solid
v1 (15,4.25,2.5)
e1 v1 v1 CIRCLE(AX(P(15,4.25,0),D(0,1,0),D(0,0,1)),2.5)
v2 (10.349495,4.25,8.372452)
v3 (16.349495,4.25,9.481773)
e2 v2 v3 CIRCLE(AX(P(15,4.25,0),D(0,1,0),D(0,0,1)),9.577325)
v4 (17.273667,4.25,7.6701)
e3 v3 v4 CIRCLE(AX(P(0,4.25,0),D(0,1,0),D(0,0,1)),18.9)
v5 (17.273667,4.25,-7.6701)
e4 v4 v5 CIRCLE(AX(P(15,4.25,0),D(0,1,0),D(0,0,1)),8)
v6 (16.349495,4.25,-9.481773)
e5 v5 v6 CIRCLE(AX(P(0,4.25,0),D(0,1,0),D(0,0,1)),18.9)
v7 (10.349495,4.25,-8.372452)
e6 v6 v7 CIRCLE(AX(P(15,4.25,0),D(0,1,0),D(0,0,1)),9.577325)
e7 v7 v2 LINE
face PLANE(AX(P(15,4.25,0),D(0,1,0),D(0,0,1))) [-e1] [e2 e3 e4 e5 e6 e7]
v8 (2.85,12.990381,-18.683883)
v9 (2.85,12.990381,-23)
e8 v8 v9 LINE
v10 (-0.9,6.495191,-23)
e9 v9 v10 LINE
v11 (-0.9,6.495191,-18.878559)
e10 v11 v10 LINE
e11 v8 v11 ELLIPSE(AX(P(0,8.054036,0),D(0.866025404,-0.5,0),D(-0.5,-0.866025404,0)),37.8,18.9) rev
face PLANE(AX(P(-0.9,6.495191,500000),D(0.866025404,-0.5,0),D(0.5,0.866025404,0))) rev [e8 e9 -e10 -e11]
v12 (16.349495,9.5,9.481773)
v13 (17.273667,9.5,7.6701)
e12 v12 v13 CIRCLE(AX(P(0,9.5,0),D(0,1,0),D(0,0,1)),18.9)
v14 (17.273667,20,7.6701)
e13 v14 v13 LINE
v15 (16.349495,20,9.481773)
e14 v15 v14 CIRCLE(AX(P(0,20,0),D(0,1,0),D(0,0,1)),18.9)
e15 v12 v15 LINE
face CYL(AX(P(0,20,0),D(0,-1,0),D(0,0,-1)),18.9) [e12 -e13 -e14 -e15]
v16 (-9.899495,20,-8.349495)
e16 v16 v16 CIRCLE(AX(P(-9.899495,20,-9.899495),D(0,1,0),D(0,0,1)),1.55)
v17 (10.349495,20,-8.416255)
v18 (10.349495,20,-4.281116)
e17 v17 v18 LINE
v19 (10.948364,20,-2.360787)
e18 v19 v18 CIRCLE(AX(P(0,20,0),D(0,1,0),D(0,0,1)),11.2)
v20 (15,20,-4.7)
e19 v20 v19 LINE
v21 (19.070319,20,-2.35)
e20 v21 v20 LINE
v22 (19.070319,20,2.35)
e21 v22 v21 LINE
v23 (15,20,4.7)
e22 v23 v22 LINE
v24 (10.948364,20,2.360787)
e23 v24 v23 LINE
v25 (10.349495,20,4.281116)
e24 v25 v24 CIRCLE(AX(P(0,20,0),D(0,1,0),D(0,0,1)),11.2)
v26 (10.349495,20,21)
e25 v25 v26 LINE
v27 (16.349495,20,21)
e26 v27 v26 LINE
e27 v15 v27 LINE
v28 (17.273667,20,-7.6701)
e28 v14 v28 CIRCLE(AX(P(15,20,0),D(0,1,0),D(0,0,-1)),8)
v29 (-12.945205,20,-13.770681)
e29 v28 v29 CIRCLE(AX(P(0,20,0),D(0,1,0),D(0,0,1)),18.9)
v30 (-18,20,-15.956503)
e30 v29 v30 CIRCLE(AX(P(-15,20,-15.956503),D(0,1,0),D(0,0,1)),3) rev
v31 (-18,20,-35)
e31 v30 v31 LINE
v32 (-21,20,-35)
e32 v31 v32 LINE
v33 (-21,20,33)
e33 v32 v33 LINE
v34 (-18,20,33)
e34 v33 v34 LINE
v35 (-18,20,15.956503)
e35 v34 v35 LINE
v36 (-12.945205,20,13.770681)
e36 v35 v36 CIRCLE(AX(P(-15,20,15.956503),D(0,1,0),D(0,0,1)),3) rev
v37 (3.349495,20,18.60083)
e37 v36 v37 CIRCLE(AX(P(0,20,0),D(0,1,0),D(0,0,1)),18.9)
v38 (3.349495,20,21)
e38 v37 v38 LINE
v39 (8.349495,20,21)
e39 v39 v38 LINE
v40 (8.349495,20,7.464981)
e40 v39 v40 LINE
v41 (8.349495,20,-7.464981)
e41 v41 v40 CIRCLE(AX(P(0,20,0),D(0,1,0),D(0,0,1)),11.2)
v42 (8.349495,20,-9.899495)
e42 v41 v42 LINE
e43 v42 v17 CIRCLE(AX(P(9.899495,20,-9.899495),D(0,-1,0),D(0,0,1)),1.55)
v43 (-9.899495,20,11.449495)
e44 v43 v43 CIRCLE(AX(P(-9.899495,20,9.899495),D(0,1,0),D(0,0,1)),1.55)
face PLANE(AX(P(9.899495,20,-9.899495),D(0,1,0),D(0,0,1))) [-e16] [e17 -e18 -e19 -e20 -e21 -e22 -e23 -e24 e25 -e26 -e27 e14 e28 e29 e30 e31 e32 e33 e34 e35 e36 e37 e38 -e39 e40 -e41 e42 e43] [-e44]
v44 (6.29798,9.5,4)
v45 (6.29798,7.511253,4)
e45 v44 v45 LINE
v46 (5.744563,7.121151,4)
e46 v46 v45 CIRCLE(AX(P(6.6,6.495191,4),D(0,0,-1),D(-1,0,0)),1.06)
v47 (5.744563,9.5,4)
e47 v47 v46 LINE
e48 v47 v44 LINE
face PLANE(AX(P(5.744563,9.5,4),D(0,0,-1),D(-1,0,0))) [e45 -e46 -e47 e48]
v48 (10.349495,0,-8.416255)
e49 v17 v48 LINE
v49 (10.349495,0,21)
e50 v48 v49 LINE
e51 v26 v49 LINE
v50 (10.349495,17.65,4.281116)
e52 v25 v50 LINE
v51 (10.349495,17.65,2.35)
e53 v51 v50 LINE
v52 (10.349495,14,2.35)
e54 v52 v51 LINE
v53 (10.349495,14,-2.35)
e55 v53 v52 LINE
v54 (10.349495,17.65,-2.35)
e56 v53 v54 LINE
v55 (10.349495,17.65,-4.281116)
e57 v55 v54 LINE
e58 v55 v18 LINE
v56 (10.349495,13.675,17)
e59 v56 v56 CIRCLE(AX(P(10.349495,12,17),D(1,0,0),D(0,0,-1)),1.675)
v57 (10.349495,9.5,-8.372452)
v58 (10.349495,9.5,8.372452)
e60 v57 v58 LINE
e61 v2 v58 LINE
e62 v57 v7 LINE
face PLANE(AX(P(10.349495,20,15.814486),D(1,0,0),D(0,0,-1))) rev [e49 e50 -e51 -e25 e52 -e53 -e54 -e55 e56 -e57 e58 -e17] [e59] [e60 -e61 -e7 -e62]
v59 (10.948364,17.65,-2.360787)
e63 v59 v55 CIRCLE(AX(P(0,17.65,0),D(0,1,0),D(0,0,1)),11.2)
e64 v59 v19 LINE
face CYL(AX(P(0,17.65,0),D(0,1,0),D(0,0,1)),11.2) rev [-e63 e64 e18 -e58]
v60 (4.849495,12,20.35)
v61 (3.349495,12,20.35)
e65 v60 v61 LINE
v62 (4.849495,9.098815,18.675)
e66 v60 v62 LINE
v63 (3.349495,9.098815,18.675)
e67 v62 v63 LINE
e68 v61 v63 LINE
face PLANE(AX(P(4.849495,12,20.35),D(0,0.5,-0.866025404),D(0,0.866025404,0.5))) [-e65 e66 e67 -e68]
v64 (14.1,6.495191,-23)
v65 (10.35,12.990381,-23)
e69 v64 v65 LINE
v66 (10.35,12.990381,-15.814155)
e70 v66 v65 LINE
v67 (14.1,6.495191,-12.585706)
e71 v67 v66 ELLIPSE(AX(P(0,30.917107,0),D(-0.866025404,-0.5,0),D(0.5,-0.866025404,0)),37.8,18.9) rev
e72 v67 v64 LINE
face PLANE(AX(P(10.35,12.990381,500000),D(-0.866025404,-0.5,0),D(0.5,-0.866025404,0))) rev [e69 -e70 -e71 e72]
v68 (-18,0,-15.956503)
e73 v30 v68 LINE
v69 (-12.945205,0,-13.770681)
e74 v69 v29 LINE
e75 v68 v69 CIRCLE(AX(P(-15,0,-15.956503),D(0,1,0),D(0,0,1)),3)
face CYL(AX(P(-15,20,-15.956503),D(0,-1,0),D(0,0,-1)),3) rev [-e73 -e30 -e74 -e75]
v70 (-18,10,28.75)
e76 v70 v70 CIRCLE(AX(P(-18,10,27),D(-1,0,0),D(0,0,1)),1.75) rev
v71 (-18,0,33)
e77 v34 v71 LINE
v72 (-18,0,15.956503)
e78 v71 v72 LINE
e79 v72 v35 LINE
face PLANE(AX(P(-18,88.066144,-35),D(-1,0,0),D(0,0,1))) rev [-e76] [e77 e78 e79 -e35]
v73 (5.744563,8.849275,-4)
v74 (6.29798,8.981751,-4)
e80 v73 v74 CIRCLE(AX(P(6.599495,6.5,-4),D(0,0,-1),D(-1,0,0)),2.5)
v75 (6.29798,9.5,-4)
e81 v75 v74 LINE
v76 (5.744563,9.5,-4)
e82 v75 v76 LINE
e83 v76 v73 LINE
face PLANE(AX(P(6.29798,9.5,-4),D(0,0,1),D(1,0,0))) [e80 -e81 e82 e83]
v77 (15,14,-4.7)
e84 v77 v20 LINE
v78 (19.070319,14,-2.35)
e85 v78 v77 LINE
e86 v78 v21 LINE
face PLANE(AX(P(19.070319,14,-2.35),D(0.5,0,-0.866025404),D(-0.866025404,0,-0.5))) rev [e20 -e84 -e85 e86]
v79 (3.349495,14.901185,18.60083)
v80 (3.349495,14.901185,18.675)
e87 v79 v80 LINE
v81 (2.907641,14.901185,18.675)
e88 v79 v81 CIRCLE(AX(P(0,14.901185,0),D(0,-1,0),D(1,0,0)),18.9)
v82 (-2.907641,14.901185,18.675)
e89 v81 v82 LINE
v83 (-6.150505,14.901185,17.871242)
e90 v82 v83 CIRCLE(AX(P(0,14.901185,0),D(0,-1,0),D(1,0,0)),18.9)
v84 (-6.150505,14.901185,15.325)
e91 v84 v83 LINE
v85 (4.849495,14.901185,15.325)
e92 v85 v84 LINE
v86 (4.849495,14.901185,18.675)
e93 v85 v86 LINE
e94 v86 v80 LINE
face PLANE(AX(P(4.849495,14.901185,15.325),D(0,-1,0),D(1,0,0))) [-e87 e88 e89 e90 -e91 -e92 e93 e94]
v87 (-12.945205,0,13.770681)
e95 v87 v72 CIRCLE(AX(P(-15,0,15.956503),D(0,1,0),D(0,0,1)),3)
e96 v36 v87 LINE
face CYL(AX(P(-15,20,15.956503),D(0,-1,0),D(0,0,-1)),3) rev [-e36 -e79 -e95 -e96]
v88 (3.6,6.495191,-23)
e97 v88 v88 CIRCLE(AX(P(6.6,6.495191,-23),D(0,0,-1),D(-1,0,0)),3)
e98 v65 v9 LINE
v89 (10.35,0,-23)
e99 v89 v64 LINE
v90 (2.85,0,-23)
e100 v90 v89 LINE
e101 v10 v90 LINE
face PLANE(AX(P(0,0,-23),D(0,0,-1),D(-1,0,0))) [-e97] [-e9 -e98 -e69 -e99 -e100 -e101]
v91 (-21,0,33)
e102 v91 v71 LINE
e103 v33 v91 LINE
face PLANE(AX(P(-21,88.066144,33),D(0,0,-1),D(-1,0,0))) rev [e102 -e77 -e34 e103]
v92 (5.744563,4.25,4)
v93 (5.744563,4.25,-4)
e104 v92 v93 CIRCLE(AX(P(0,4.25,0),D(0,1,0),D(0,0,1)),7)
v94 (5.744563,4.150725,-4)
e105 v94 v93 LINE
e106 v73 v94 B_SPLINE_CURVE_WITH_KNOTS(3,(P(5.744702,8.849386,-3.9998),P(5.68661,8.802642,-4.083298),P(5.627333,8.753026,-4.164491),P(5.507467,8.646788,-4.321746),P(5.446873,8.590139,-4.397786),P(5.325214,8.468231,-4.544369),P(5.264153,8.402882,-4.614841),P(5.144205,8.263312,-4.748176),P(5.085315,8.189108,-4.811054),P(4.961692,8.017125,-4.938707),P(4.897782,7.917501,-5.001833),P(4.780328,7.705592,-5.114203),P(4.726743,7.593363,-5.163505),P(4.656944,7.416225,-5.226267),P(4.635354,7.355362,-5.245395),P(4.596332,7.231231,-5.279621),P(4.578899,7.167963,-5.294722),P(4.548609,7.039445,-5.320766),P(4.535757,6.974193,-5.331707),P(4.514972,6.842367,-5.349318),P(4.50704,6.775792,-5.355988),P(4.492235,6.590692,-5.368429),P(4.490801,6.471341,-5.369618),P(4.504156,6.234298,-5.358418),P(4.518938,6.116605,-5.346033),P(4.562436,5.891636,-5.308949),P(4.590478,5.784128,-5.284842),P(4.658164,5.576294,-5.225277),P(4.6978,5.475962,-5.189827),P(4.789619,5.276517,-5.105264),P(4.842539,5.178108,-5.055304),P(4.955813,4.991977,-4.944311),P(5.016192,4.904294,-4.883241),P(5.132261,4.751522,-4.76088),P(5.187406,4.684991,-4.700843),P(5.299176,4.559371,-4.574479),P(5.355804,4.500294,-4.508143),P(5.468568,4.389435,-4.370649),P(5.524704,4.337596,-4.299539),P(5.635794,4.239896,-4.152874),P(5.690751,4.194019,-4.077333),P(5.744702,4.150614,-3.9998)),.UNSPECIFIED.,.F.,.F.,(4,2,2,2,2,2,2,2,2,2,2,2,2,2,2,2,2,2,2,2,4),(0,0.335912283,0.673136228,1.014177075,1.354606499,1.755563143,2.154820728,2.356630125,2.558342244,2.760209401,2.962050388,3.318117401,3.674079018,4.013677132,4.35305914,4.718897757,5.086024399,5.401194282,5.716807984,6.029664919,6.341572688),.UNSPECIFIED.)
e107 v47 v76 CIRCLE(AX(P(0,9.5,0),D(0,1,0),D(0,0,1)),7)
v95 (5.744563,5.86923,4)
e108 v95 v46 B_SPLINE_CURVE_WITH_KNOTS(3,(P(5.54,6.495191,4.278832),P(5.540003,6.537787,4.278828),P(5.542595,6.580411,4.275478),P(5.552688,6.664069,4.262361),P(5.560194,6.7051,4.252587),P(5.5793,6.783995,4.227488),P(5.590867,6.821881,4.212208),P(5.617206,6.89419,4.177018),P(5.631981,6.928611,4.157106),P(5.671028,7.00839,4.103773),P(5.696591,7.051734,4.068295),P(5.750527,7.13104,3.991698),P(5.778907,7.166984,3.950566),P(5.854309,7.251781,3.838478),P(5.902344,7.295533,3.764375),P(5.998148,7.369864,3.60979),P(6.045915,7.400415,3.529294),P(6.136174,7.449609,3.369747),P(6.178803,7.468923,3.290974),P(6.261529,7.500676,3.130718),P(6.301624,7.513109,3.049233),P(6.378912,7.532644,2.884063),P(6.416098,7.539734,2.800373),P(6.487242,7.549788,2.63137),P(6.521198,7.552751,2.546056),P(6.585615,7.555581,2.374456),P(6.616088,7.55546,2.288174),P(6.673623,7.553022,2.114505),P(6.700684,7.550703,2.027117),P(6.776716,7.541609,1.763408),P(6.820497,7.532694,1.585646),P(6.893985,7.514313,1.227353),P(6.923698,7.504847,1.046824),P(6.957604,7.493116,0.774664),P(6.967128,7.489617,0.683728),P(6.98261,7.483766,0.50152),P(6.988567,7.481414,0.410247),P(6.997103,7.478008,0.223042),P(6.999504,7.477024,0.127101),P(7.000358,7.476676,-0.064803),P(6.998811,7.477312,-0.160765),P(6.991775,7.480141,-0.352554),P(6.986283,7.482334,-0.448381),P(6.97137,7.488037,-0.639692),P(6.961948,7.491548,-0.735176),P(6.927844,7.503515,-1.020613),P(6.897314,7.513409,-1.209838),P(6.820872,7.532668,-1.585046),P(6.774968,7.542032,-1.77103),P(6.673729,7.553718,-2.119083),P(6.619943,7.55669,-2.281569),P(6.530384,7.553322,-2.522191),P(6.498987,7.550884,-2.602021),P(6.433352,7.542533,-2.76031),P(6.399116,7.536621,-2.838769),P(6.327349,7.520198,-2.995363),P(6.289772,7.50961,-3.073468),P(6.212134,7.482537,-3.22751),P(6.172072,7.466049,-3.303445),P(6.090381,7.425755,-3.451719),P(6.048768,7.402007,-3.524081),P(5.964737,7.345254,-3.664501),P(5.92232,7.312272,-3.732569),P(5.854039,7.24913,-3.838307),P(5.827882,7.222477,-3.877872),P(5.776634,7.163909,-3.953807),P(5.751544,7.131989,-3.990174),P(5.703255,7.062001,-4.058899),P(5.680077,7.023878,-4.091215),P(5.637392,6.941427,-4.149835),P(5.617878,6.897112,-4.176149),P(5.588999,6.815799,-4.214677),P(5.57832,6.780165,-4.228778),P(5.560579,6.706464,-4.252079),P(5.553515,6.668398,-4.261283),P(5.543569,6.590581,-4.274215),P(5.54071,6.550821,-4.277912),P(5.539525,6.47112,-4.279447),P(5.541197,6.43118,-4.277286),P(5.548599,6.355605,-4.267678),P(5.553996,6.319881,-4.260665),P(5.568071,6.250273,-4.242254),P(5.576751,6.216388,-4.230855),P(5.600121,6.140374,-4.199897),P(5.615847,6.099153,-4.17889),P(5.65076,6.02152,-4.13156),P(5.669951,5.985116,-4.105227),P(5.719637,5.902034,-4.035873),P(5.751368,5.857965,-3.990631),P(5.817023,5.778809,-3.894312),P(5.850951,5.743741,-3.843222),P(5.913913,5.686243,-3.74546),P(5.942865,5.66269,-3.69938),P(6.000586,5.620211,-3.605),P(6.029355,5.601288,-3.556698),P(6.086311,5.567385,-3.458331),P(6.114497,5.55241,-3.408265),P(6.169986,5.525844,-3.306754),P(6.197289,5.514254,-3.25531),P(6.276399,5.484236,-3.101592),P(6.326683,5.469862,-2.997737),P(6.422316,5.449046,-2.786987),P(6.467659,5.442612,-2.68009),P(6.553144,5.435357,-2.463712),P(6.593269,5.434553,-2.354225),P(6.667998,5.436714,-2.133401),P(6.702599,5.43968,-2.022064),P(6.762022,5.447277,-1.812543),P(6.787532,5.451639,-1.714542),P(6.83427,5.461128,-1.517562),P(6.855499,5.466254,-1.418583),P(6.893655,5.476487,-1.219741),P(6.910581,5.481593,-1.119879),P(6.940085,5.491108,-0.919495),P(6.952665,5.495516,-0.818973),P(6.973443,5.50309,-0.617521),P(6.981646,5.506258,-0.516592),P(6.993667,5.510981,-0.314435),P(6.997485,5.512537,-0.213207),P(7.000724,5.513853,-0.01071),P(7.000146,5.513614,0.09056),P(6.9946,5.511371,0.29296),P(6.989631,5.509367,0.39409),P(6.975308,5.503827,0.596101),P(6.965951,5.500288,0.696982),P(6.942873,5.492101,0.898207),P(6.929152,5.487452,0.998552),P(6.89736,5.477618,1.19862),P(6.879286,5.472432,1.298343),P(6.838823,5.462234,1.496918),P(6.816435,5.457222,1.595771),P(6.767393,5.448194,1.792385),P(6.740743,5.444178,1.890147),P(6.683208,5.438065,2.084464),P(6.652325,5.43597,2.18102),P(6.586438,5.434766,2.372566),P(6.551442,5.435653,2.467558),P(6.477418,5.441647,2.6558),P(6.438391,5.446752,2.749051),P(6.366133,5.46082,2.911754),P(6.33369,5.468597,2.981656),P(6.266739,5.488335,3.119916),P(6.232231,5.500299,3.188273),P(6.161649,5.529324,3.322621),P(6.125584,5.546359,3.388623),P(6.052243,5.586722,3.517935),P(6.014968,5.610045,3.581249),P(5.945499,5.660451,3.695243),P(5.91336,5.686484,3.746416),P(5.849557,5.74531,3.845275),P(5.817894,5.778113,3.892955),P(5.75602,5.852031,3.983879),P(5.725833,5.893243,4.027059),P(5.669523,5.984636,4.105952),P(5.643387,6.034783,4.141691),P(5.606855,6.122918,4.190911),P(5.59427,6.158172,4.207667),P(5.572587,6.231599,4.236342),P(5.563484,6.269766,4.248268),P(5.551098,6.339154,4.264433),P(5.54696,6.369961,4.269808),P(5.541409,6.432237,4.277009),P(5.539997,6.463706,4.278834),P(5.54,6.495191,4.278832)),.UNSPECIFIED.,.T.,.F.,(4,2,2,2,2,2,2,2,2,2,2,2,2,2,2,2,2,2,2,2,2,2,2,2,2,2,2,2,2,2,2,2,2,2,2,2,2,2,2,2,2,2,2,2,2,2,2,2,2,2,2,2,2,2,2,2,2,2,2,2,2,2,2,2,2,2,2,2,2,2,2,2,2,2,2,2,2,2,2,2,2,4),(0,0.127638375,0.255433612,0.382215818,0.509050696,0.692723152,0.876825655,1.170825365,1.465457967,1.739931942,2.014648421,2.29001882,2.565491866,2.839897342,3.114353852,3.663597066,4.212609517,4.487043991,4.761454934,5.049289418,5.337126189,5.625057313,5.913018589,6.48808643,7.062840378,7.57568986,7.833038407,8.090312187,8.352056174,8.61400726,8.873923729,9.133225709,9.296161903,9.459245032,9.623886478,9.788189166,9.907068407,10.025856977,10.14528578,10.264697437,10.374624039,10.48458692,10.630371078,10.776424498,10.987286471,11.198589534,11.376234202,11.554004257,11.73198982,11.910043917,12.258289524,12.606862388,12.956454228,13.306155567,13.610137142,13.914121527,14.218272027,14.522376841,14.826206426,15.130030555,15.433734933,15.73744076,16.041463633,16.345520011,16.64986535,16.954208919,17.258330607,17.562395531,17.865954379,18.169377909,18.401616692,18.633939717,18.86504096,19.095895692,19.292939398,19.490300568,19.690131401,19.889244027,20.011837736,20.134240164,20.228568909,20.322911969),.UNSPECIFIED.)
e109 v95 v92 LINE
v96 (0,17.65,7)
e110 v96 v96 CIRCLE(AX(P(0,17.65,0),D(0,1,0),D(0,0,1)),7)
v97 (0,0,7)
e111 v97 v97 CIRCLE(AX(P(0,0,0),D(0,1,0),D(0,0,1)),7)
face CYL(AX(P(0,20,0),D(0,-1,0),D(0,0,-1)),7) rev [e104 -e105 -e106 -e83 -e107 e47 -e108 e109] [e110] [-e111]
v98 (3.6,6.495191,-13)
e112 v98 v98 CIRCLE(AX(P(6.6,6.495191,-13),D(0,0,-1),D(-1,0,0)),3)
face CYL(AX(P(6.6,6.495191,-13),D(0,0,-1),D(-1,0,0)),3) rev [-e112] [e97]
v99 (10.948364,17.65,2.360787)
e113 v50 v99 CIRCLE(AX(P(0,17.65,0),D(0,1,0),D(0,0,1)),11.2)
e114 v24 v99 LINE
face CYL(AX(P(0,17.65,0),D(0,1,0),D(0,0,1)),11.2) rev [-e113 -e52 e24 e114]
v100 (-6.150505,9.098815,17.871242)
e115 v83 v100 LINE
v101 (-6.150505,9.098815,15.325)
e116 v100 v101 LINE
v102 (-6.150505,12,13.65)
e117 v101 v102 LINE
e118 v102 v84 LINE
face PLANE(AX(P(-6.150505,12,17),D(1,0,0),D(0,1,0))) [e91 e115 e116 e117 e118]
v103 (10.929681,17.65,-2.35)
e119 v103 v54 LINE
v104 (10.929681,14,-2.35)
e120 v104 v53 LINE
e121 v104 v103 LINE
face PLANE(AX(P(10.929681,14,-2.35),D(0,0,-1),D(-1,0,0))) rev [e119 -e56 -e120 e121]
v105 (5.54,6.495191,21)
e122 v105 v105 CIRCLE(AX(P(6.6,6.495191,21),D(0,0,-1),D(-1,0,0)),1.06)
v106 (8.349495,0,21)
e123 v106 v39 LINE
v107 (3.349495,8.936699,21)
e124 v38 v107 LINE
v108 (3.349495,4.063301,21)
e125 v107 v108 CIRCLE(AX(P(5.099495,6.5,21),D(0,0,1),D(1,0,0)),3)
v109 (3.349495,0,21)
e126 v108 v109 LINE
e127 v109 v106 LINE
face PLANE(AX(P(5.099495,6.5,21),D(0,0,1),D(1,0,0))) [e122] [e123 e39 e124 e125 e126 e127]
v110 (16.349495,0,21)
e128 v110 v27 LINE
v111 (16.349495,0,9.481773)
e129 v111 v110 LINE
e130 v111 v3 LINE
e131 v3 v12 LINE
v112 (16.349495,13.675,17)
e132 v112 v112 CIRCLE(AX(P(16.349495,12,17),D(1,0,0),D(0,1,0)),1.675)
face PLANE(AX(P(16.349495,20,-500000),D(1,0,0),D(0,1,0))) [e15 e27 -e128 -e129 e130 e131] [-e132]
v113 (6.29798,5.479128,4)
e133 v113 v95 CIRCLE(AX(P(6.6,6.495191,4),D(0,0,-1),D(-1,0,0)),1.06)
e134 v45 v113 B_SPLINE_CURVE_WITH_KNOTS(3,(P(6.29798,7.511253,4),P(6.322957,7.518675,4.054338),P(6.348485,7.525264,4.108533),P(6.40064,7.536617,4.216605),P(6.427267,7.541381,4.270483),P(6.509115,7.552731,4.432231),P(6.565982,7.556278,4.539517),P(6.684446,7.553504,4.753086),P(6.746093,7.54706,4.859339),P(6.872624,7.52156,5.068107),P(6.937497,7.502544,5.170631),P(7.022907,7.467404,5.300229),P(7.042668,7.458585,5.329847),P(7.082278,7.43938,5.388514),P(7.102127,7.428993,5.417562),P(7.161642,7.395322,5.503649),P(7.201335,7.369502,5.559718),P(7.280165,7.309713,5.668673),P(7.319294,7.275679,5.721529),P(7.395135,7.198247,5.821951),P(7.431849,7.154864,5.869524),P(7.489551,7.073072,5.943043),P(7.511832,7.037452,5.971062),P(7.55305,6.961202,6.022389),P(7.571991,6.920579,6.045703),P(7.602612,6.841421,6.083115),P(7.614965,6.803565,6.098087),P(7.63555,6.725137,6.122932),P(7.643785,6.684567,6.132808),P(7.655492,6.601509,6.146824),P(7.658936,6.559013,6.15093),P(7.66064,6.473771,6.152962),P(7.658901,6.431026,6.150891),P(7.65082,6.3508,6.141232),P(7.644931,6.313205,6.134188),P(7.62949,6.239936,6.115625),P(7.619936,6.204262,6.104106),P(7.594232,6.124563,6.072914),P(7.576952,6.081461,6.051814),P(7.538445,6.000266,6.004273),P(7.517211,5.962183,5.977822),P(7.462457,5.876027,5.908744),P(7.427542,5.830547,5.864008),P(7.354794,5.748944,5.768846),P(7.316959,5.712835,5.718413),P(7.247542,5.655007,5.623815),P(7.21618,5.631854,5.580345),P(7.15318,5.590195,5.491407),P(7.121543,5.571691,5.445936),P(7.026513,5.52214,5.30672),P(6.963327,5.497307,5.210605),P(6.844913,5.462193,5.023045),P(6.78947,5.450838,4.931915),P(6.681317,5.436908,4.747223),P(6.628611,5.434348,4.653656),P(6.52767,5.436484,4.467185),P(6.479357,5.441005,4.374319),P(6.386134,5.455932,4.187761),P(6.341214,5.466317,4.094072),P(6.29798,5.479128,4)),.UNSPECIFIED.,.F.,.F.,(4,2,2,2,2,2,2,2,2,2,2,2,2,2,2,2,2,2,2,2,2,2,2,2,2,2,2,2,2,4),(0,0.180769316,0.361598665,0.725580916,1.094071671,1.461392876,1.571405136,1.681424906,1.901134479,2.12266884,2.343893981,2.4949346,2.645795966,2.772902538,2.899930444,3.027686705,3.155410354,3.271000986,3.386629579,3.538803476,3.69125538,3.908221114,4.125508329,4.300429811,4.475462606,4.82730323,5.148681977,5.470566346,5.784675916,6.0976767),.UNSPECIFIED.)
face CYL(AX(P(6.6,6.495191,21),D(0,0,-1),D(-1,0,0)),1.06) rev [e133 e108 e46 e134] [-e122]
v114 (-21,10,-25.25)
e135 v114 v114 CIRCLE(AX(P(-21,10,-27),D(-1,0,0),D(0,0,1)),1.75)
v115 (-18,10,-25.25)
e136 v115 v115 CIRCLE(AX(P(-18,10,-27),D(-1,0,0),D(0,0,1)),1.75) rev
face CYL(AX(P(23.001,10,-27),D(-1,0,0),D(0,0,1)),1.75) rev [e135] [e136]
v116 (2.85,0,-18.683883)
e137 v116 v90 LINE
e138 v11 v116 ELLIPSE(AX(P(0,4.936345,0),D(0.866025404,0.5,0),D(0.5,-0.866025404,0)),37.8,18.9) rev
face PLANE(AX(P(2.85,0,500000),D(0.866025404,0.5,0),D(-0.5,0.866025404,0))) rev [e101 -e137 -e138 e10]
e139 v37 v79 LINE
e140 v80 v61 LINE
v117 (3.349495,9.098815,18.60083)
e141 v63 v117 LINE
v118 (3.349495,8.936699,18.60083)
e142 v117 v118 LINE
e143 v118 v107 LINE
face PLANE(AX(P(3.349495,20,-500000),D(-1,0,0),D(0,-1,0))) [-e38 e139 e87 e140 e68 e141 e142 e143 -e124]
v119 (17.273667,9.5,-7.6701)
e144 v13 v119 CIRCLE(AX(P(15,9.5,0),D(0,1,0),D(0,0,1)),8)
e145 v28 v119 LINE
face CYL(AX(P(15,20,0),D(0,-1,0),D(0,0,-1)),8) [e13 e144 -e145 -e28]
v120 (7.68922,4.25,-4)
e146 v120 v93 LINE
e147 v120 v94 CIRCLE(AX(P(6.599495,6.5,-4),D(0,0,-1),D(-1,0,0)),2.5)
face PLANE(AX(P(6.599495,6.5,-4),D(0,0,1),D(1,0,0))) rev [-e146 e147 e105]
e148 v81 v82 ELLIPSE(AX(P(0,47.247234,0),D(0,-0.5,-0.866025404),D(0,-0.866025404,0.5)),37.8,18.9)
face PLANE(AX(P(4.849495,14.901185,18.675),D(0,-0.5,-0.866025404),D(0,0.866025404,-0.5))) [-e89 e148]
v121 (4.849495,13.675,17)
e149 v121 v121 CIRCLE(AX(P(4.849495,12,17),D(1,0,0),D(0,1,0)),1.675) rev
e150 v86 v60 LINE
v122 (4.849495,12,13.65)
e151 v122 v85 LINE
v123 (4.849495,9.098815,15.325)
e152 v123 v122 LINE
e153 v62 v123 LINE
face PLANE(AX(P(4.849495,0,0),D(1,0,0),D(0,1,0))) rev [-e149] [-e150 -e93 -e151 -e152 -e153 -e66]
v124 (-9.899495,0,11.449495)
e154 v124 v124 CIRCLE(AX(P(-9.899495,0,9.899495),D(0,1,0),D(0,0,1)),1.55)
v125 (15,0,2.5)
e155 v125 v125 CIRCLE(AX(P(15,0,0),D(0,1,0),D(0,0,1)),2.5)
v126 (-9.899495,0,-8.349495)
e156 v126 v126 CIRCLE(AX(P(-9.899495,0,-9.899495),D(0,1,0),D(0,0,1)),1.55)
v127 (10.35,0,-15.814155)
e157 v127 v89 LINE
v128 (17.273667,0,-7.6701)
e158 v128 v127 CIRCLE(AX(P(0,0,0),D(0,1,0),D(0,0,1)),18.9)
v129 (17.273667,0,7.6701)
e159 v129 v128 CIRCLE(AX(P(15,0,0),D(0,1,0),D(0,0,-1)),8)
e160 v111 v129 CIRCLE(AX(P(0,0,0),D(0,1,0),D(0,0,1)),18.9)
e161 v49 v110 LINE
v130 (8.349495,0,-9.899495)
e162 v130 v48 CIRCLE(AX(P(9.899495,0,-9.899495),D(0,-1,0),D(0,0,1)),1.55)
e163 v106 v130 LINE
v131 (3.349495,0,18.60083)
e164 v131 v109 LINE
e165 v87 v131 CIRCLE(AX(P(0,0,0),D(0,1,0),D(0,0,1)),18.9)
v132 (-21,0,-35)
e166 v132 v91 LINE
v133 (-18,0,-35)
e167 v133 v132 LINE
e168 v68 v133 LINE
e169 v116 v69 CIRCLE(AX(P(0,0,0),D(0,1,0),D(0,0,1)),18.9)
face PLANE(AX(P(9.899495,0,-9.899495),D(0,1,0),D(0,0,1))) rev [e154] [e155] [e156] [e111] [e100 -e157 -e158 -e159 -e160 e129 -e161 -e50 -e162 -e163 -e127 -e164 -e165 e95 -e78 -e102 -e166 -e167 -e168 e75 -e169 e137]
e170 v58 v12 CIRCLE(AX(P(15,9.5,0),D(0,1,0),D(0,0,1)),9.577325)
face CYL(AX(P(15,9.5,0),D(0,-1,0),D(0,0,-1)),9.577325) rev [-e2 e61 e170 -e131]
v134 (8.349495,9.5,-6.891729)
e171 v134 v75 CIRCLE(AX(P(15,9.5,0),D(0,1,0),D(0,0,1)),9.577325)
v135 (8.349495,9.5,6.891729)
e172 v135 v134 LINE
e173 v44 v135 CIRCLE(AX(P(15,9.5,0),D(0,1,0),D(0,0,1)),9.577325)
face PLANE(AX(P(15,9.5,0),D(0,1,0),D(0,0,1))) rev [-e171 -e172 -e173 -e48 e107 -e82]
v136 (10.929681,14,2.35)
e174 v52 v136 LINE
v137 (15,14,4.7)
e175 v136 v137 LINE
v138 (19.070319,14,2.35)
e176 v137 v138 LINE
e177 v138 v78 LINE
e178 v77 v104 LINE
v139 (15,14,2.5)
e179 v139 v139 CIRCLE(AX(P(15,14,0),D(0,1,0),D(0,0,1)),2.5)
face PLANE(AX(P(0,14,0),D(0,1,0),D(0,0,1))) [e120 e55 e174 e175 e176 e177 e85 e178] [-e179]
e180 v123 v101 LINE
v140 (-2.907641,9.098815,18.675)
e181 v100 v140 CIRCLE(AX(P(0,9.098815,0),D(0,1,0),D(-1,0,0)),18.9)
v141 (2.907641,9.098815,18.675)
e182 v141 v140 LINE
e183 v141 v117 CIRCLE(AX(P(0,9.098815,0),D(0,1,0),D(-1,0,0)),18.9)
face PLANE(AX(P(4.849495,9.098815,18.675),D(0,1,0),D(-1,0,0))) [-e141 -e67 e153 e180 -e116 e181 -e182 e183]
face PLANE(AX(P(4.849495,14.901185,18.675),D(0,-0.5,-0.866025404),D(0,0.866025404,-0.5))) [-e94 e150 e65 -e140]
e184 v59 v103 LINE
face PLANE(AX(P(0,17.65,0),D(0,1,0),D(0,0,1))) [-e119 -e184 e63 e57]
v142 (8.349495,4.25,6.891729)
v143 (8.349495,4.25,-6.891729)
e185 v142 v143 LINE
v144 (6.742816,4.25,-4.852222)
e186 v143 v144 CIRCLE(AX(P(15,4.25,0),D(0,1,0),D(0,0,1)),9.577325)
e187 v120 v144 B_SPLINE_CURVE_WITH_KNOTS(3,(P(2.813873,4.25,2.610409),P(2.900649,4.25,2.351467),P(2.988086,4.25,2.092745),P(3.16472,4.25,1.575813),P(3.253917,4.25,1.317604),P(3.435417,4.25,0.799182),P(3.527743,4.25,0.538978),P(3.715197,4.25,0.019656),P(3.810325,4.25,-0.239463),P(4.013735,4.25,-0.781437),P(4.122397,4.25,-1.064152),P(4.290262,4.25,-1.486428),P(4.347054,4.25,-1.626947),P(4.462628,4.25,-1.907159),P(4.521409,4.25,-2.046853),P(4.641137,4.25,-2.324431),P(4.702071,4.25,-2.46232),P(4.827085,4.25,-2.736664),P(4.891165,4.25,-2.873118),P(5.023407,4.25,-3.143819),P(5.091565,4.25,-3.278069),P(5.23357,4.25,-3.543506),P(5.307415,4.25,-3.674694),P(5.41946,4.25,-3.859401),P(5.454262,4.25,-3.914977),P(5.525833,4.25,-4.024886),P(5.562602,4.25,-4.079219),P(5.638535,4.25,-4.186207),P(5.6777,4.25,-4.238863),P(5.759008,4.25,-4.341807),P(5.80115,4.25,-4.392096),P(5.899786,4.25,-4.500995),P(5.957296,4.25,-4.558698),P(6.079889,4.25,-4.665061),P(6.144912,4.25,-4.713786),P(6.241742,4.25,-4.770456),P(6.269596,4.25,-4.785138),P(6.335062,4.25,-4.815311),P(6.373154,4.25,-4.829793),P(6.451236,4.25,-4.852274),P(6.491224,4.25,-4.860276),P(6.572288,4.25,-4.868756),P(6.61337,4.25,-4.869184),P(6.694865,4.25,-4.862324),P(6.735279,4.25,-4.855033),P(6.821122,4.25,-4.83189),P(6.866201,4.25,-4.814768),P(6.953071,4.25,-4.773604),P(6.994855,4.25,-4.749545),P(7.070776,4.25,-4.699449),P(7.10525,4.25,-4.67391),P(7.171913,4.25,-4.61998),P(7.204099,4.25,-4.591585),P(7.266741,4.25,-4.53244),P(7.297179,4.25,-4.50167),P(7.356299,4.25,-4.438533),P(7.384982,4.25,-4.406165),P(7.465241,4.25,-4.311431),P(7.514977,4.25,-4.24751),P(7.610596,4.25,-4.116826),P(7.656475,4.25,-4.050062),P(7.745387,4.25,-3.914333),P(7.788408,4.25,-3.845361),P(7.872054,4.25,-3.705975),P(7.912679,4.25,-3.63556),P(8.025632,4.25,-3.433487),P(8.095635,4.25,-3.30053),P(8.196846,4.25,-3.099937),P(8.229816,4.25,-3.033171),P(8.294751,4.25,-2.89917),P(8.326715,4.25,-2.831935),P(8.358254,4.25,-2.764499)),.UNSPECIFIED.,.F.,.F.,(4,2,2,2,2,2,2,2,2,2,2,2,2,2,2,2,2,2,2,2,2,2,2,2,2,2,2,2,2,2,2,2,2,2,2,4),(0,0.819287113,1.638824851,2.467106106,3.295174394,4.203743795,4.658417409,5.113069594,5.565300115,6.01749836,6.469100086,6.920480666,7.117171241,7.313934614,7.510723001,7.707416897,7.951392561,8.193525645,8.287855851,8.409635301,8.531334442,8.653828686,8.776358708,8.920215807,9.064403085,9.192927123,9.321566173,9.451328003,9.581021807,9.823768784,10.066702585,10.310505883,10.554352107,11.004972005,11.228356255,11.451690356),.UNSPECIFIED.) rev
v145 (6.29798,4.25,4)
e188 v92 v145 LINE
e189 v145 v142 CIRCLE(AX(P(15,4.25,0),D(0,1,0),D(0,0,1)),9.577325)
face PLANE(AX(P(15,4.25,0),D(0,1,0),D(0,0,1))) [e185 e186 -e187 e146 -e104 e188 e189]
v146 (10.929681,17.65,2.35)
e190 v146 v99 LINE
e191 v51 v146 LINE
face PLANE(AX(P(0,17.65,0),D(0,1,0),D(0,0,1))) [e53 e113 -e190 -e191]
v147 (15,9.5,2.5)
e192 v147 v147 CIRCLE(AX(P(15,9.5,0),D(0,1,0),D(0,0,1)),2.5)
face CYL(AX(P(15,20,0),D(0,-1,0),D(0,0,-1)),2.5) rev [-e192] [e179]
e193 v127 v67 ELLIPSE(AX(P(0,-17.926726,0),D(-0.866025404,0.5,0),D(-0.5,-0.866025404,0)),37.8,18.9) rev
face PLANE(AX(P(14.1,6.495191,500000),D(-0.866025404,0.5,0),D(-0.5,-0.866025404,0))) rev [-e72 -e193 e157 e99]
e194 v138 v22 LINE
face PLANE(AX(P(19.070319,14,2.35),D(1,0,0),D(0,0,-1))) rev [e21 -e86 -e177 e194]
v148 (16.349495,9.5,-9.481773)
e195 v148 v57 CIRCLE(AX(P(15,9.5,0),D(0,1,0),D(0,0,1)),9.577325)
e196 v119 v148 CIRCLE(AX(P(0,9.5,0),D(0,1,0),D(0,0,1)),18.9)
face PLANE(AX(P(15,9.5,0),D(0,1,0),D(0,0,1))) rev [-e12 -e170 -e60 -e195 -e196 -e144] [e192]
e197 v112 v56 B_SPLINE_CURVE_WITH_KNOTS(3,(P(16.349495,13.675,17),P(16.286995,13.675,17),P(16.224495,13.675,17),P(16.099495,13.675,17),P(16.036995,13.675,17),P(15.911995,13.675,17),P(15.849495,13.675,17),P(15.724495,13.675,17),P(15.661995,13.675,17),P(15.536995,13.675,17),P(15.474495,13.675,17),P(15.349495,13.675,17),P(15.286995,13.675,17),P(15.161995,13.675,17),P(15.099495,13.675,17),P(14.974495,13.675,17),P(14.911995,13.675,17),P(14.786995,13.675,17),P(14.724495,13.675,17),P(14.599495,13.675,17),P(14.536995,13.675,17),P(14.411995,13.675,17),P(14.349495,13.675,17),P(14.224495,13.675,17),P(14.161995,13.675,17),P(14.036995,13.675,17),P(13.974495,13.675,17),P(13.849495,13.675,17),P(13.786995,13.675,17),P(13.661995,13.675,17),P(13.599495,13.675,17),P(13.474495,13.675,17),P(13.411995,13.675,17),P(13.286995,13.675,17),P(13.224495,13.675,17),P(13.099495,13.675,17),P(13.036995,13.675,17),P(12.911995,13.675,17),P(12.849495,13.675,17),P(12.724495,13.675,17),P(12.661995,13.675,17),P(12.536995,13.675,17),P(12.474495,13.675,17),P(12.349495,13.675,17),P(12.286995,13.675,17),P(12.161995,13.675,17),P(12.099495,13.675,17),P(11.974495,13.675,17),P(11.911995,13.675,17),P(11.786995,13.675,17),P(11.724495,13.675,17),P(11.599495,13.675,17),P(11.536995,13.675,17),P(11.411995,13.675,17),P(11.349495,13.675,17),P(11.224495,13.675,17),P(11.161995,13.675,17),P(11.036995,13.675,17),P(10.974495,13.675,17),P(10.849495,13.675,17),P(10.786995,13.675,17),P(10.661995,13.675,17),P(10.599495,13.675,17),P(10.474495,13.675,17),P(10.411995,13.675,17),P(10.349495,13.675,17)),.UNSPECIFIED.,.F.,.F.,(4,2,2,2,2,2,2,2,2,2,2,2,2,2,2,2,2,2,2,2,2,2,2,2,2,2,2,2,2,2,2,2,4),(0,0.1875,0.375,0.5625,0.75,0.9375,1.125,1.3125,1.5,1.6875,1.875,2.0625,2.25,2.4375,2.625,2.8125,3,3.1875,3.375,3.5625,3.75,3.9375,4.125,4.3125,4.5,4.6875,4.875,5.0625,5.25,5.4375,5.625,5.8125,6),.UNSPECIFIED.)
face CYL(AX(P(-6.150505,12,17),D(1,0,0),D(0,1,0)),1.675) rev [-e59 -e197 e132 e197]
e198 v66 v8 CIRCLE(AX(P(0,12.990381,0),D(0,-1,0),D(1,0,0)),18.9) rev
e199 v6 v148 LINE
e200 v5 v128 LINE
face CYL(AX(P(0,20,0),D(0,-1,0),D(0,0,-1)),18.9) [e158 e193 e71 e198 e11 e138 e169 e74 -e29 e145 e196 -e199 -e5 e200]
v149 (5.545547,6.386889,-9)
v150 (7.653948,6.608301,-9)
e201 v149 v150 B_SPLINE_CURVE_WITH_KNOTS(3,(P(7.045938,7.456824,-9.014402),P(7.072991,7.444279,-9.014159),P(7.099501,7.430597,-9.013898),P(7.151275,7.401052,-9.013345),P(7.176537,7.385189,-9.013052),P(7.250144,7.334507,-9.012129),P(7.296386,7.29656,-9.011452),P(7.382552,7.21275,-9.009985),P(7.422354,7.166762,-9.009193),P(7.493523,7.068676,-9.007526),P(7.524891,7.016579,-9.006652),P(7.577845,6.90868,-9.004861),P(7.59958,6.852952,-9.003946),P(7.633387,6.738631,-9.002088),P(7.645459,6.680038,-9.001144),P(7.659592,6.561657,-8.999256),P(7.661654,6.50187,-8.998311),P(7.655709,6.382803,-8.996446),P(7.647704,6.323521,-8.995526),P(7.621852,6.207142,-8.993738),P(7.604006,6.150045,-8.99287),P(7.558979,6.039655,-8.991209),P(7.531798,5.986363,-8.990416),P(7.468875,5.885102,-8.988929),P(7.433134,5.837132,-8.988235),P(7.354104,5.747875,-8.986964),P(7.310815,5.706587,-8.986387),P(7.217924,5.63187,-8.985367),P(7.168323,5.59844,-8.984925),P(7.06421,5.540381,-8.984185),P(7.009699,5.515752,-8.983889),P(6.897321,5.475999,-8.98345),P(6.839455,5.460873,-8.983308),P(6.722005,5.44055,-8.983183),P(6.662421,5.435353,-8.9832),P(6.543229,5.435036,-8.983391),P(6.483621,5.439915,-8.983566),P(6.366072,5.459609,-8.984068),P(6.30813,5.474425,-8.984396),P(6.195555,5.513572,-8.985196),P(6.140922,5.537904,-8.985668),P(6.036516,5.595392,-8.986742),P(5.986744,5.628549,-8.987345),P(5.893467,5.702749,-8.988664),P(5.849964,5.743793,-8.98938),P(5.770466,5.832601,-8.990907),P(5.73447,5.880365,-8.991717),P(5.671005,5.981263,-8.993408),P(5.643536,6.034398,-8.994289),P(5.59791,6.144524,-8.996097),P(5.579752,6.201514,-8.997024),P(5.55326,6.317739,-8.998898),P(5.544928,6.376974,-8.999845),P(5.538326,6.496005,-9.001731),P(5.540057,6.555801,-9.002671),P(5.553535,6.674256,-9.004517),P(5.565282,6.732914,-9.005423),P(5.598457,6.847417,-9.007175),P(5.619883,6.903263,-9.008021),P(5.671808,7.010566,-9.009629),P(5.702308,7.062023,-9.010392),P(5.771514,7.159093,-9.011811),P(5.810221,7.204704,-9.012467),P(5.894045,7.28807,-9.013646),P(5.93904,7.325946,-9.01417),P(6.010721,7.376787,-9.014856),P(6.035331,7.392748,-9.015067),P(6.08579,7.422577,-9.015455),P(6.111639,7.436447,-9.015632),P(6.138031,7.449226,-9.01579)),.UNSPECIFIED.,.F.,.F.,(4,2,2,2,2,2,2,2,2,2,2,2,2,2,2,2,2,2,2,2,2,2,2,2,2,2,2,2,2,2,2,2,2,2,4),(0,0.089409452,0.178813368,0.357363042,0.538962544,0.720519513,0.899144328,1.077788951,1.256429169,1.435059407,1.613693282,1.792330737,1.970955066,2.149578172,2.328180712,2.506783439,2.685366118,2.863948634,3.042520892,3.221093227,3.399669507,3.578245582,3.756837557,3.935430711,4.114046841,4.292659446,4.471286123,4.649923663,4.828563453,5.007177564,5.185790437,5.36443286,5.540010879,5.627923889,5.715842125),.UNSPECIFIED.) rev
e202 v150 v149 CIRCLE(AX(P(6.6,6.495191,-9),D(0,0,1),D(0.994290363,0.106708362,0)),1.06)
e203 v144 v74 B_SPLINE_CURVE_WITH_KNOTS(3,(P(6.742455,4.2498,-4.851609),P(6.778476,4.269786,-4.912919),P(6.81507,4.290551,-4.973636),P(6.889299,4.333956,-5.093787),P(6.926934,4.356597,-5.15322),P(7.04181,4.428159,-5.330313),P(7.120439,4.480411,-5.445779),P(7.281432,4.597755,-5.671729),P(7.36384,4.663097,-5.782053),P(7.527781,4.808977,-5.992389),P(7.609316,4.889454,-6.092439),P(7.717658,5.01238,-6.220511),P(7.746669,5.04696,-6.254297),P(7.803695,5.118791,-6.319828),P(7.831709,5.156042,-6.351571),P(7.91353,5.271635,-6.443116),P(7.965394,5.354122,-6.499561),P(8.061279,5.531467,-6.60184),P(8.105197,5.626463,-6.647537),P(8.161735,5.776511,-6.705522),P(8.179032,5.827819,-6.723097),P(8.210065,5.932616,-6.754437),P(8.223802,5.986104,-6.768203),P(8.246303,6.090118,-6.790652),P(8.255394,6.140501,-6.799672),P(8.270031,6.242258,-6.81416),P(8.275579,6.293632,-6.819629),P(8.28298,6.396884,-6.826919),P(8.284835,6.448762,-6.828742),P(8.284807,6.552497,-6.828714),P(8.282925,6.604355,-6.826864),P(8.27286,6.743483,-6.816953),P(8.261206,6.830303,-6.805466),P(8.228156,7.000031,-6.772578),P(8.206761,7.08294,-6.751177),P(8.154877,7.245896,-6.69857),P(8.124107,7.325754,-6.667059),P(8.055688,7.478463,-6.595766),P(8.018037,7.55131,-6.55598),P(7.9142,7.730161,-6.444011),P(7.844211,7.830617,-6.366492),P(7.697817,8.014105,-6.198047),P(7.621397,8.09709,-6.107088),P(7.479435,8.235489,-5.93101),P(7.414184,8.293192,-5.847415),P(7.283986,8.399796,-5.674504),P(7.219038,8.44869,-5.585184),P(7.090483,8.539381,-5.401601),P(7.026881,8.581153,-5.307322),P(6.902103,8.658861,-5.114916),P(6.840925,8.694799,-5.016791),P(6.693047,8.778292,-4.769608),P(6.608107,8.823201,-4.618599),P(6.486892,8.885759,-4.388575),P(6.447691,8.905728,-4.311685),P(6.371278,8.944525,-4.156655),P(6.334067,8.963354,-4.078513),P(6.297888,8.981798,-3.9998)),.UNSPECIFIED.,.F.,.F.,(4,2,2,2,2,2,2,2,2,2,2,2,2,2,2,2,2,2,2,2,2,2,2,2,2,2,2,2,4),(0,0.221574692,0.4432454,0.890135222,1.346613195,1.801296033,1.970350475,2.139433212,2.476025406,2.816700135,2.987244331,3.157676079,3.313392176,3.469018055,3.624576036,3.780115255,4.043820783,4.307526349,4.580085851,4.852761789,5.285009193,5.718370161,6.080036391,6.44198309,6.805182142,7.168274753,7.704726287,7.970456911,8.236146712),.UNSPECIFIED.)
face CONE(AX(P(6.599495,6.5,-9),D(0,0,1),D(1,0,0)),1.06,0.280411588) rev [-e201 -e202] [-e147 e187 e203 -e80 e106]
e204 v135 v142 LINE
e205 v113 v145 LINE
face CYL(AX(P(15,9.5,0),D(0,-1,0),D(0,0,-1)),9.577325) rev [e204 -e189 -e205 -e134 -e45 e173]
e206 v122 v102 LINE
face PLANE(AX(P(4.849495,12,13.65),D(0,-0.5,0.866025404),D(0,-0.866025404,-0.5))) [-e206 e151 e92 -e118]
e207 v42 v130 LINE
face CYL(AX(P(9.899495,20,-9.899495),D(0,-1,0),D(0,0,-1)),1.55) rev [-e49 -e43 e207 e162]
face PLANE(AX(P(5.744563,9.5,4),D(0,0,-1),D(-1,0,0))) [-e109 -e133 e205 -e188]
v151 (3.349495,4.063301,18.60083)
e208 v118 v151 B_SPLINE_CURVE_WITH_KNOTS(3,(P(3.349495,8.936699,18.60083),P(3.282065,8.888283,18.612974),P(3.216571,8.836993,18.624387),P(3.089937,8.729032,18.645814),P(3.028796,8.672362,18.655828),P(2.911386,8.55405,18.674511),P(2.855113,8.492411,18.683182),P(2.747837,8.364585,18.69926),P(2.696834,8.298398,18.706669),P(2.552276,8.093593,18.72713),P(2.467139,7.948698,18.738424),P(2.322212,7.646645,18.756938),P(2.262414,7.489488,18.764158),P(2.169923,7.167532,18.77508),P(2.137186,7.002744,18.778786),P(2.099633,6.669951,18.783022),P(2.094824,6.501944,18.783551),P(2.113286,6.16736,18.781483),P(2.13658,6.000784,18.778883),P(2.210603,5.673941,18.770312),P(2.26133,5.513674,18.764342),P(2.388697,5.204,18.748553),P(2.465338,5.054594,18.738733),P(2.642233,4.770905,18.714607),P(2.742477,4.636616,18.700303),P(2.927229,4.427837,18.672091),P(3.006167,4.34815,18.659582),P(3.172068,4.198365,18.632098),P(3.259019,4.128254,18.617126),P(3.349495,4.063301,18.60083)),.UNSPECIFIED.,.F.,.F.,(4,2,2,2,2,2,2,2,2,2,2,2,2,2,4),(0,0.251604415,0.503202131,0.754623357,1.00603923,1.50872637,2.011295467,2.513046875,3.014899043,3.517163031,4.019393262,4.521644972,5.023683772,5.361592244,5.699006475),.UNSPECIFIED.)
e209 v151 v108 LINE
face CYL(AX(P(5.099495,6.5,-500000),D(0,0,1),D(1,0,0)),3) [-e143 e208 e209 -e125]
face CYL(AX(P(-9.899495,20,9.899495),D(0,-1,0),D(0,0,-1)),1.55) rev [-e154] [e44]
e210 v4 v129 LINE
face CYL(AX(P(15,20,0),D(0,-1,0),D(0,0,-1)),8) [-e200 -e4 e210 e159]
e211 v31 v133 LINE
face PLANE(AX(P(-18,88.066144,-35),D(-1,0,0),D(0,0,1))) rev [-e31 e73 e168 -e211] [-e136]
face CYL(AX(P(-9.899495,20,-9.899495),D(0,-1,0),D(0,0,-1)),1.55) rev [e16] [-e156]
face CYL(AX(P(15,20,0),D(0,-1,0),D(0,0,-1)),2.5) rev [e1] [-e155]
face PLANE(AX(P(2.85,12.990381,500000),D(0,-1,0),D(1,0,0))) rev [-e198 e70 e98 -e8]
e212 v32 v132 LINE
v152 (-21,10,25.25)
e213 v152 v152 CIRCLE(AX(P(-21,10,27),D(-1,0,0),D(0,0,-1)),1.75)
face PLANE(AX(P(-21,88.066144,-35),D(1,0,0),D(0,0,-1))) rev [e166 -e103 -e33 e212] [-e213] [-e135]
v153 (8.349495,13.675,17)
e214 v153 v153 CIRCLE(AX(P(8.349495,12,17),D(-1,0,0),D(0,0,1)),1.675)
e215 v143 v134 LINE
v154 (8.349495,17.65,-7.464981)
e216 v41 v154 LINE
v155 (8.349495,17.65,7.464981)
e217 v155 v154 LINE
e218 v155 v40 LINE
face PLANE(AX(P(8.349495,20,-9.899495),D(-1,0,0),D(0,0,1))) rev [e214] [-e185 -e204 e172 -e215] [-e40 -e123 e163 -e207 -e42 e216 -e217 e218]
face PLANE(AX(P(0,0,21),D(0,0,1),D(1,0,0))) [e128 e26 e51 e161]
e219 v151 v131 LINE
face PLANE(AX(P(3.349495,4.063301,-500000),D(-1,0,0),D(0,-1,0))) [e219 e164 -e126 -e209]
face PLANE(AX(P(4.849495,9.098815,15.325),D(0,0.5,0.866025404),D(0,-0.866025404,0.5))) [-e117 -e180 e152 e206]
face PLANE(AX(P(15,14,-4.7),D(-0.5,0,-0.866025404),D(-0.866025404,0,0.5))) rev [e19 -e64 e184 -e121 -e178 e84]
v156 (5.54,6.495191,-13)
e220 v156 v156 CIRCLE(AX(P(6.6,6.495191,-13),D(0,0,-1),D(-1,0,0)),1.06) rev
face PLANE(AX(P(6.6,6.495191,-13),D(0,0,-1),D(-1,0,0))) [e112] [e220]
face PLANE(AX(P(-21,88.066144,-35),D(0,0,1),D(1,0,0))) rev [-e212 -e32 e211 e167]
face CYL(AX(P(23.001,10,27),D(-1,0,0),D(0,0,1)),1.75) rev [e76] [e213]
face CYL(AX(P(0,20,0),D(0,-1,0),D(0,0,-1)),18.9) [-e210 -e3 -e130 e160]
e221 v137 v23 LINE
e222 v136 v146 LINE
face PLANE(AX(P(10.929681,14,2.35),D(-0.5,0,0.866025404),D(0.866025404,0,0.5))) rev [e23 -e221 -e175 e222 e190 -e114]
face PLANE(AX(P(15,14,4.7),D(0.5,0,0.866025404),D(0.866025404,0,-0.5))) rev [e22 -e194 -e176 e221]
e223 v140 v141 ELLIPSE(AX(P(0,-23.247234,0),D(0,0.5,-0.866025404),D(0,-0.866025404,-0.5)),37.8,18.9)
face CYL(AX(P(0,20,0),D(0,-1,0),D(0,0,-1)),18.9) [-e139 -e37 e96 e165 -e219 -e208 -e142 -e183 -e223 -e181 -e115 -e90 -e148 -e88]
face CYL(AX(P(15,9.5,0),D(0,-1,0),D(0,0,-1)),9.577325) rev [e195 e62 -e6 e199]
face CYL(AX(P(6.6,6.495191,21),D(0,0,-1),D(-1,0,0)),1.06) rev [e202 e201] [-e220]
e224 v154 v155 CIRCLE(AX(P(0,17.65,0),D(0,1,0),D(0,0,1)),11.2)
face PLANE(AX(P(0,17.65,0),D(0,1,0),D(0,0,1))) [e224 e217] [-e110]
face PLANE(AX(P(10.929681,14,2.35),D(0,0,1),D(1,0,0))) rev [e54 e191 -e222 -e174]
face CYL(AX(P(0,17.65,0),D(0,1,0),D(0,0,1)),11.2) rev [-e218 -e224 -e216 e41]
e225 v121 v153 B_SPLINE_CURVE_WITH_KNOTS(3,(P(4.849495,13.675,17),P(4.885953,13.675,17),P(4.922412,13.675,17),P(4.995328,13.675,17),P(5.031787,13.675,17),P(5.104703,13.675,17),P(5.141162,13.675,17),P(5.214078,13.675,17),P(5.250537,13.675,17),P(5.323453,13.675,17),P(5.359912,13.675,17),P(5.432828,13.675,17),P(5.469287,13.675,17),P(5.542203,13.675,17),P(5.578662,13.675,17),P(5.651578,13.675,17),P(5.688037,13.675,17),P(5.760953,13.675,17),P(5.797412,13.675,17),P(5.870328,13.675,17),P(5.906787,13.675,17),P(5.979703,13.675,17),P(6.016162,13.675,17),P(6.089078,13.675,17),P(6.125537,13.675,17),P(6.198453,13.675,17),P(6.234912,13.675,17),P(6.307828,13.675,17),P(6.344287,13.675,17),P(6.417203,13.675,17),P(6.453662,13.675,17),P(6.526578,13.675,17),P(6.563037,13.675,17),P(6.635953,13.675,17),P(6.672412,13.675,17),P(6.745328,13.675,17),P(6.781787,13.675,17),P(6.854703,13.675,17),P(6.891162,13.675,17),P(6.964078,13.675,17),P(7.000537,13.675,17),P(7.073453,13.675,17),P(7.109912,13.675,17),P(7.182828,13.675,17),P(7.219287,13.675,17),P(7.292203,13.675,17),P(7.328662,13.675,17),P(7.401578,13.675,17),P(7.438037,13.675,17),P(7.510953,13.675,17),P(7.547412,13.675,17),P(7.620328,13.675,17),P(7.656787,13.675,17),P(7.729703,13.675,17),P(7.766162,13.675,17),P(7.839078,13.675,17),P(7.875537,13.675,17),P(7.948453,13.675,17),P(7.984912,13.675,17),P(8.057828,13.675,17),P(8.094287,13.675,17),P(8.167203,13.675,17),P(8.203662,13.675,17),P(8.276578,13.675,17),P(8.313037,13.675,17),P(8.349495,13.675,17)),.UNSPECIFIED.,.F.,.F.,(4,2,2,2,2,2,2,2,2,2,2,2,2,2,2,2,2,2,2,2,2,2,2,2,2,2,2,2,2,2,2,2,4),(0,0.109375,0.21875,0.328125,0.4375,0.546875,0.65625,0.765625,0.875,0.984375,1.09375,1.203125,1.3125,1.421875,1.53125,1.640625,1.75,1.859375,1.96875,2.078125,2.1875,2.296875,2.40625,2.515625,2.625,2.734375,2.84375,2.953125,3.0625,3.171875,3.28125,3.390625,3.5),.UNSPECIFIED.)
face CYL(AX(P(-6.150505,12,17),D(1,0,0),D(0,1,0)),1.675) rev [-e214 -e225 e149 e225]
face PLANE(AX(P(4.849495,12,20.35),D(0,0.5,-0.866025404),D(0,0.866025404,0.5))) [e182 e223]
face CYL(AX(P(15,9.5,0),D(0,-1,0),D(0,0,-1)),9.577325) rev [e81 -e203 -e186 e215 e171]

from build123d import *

# Parameters (mm, degrees)
SKETCH1_R                = 1.55
SKETCH1_R_2              = 7
SKETCH1_R_3              = 2.5
BOSS_EXTRUDE1_DEPTH      = 20
BOSS_EXTRUDE2_REACH      = 53.813
BOSS_EXTRUDE2_END_RADIUS = 18.9
BOSS_EXTRUDE3_REACH      = 55.526
BOSS_EXTRUDE3_END_RADIUS = 18.9
SKETCH3_W                = 6
SKETCH3_H                = 20
SKETCH5_R                = 1.675
CUT_EXTRUDE3_DEPTH       = 22.5
CUT_EXTRUDE4_DEPTH       = 11
CUT_EXTRUDE5_DEPTH       = 5.25
SKETCH8_R                = 1.06
CUT_EXTRUDE6_DEPTH       = 54.525694884
SKETCH9_R                = 3
CUT_EXTRUDE7_DEPTH       = 10
SKETCH11_R               = 11.2
CUT_EXTRUDE9_DEPTH       = 2.35
CUT_EXTRUDE8_DEPTH       = 6
SKETCH15_W               = 3
SKETCH15_H               = 68
BOSS_EXTRUDE5_DEPTH      = 20
FILLET2_R                = 3
CUT_EXTRUDE11_REACH      = 61.674
SKETCH16_R               = 1.75


with BuildPart() as part:
    # Sketch1 → Boss-Extrude1 (new body)
    with BuildSketch(Plane(origin=(0, 0, 0), x_dir=(1, 0, 0), z_dir=(0, 1, 0))):
        with BuildLine():
            Line((10.349494937, -15.814485593), (10.349494937, 8.416255239))
            ThreePointArc((10.349494937, 8.416255239), (10.822804202, 11.144484896), (8.349494937, 9.899494937))
            Line((8.349494937, 9.899494937), (8.349494937, -16.955705067))
            ThreePointArc((8.349494937, -16.955705067), (-17.76919177, 6.439396233), (17.273666667, 7.670100383))
            ThreePointArc((17.273666667, 7.670100383), (23, 0), (17.273666667, -7.670100383))
            ThreePointArc((17.273666667, -7.670100383), (14.399392933, -12.242037541), (10.349494937, -15.814485593))
        make_face()
        with Locations(Location((-9.899494937, 9.899494937, 0), (0, 0, 270))):
            Circle(SKETCH1_R, mode=Mode.SUBTRACT)
        with Locations(Location((-9.899494937, -9.899494937, 0), (0, 0, 270))):
            Circle(SKETCH1_R, mode=Mode.SUBTRACT)
        with Locations(Location((0, 0, 0), (0, 0, 270))):
            Circle(SKETCH1_R_2, mode=Mode.SUBTRACT)
        with Locations(Location((15, 0, 0), (0, 0, 270))):
            Circle(SKETCH1_R_3, mode=Mode.SUBTRACT)
    extrude(amount=BOSS_EXTRUDE1_DEPTH)

    # Boss-Extrude2: up to this cylinder (the profile starts outside it)
    boss_extrude2_end = Plane(origin=(0, 6.495191, 0), z_dir=(0, -1, 0)) * Cylinder(BOSS_EXTRUDE2_END_RADIUS, 146.426, mode=Mode.PRIVATE)
    # Sketch2 → Boss-Extrude2 (add, up to the surface)
    with BuildSketch(Plane.XY.offset(-23), mode=Mode.PRIVATE) as boss_extrude2_sk1:
        Polygon((14.1, 6.495190528), (10.35, 0), (2.85, 0), (-0.9, 6.495190528), (2.85, 12.990381057), (10.35, 12.990381057), align=None)
    boss_extrude2_tool1 = extrude(boss_extrude2_sk1.sketch, amount=BOSS_EXTRUDE2_REACH, mode=Mode.PRIVATE) - boss_extrude2_end
    add(boss_extrude2_tool1.solids().sort_by_distance((6.6, 6.495191, -23))[0])

    # Boss-Extrude3: up to this cylinder (the profile starts outside it)
    boss_extrude3_end = Plane(origin=(0, 9.928375, 0), z_dir=(0, -1, 0)) * Cylinder(BOSS_EXTRUDE3_END_RADIUS, 149.99525, mode=Mode.PRIVATE)
    # Sketch3 → Boss-Extrude3 (add, up to the surface)
    with BuildSketch(Plane.XY.offset(21), mode=Mode.PRIVATE) as boss_extrude3_sk1:
        with BuildLine():
            Line((8.349494937, 20), (3.349494937, 20))
            Line((3.349494937, 20), (3.349494937, 8.936698586))
            ThreePointArc((3.349494937, 8.936698586), (2.099494937, 6.5), (3.349494937, 4.063301414))
            Line((3.349494937, 4.063301414), (3.349494937, 0))
            Line((3.349494937, 0), (8.349494937, 0))
            Line((8.349494937, 0), (8.349494937, 20))
        make_face()
    boss_extrude3_tool1 = extrude(boss_extrude3_sk1.sketch, amount=-BOSS_EXTRUDE3_REACH, mode=Mode.PRIVATE) - boss_extrude3_end
    add(boss_extrude3_tool1.solids().sort_by_distance((5.726294, 9.85675, 21))[0])
    # Sketch3 → Boss-Extrude3 (add, up to the surface)
    with BuildSketch(Plane.XY.offset(21), mode=Mode.PRIVATE) as boss_extrude3_sk2:
        with Locations((13.349494937, 10)):
            Rectangle(SKETCH3_W, SKETCH3_H)
    boss_extrude3_tool2 = extrude(boss_extrude3_sk2.sketch, amount=-BOSS_EXTRUDE3_REACH, mode=Mode.PRIVATE) - boss_extrude3_end
    add(boss_extrude3_tool2.solids().sort_by_distance((13.349495, 10, 21))[0])

    # Sketch5 → Cut-Extrude3 (cut)
    with BuildSketch(Plane(origin=(16.349494937, 0, 0), x_dir=(0, 0, -1), z_dir=(1, 0, 0))):
        with Locations(Location((-17, 12, 0), (0, 0, 90))):
            Circle(SKETCH5_R)
    extrude(amount=-CUT_EXTRUDE3_DEPTH, mode=Mode.SUBTRACT)

    # Sketch6 → Cut-Extrude4 (cut)
    with BuildSketch(Plane(origin=(-6.150505063, 0, 0), x_dir=(0, 0, -1), z_dir=(1, 0, 0))):
        Polygon((-20.35, 12), (-18.675, 9.098814897), (-15.325, 9.098814897), (-13.65, 12), (-15.325, 14.901185103), (-18.675, 14.901185103), align=None)
    extrude(amount=CUT_EXTRUDE4_DEPTH, mode=Mode.SUBTRACT)

    # Sketch7 → Cut-Extrude5 (cut)
    with BuildSketch(Plane(origin=(0, 4.25, 0), x_dir=(1, 0, 0), z_dir=(0, 1, 0))):
        with BuildLine():
            Line((6.29798001, 4), (5.744562647, 4))
            Line((5.744562647, 4), (5.744562647, -4))
            Line((5.744562647, -4), (6.29798001, -4))
            ThreePointArc((6.29798001, -4), (24.577324882, 0), (6.29798001, 4))
        make_face()
    extrude(amount=CUT_EXTRUDE5_DEPTH, mode=Mode.SUBTRACT)

    # Sketch8 → Cut-Extrude6 (cut, through all)
    with BuildSketch(Plane(origin=(0, 0, -23), x_dir=(-1, 0, 0), z_dir=(0, 0, -1))):
        with Locations((-6.6, 6.495190528)):
            Circle(SKETCH8_R)
    extrude(amount=-CUT_EXTRUDE6_DEPTH, mode=Mode.SUBTRACT)

    # Sketch9 → Cut-Extrude7 (cut)
    with BuildSketch(Plane(origin=(0, 0, -23), x_dir=(-1, 0, 0), z_dir=(0, 0, -1))):
        with Locations((-6.6, 6.495190528)):
            Circle(SKETCH9_R)
    extrude(amount=-CUT_EXTRUDE7_DEPTH, mode=Mode.SUBTRACT)

    # Sketch11 → Cut-Extrude9 (cut)
    with BuildSketch(Plane(origin=(0, 20, 0), x_dir=(1, 0, 0), z_dir=(0, 1, 0))):
        Circle(SKETCH11_R)
    extrude(amount=-CUT_EXTRUDE9_DEPTH, mode=Mode.SUBTRACT)

    # Sketch10 → Cut-Extrude8 (cut)
    with BuildSketch(Plane(origin=(0, 20, 0), x_dir=(1, 0, 0), z_dir=(0, 1, 0))):
        Polygon((15, 4.7), (10.929680602, 2.35), (10.349494937, 2.35), (10.349494937, -2.35), (10.929680602, -2.35), (15, -4.7), (19.070319398, -2.35), (19.070319398, 2.35), align=None)
    extrude(amount=-CUT_EXTRUDE8_DEPTH, mode=Mode.SUBTRACT)

    # Cut-Revolve1: read off the stored shape, not the designer's step
    # Cut-Revolve1: loft between two sections, ruled curve by curve
    cut_revolve1_from = [
        Edge.make_three_point_arc((7.653578644, 6.608263478, -9.001288479), (6.491231459, 7.554083708, -9.001288479), (5.545411229, 6.391736522, -9.001288479)),
        Edge.make_three_point_arc((5.545411229, 6.391736522, -9.001288479), (6.707758415, 5.445916292, -9.001288479), (7.653578644, 6.608263478, -9.001288479)),
    ]
    cut_revolve1_to = [
        Edge.make_three_point_arc((9.086412031, 6.755427811, -4), (6.344067126, 8.986917094, -4), (4.112577842, 6.244572189, -4)),
        Edge.make_three_point_arc((4.112577842, 6.244572189, -4), (6.854922748, 4.013082906, -4), (9.086412031, 6.755427811, -4)),
    ]
    cut_revolve1 = Solid(Shell([*[Face.make_surface_from_curves(cut_revolve1_from[k], cut_revolve1_to[k]) for k in range(2)], Face(Wire(cut_revolve1_from)), Face(Wire(cut_revolve1_to))]))
    add(cut_revolve1, mode=Mode.SUBTRACT)

    # Sketch15 → Boss-Extrude5 (add)
    with BuildSketch(Plane(origin=(0, 0, 0), x_dir=(1, 0, 0), z_dir=(0, 1, 0))):
        with Locations((-19.5, 1)):
            Rectangle(SKETCH15_W, SKETCH15_H)
    extrude(amount=BOSS_EXTRUDE5_DEPTH)

    # Fillet2
    fillet2_edges = [part.edges().sort_by_distance(p)[0] for p in [
        (-18, 10, -5.762811814),
        (-18, 10, 5.762811814),
    ]]
    fillet(fillet2_edges, radius=FILLET2_R)

    # Sketch16 → Cut-Extrude11 (cut, up to next)
    with BuildSketch(Plane.ZY.offset(21), mode=Mode.PRIVATE) as cut_extrude11_sk1:
        with Locations((-27, 10)):
            Circle(SKETCH16_R)
    cut_extrude11_tool1 = extrude(cut_extrude11_sk1.sketch, amount=-CUT_EXTRUDE11_REACH, mode=Mode.PRIVATE) & part.part
    # Sketch16 → Cut-Extrude11 (cut, up to next)
    with BuildSketch(Plane.ZY.offset(21), mode=Mode.PRIVATE) as cut_extrude11_sk2:
        with Locations((27, 10)):
            Circle(SKETCH16_R)
    cut_extrude11_tool2 = extrude(cut_extrude11_sk2.sketch, amount=-CUT_EXTRUDE11_REACH, mode=Mode.PRIVATE) & part.part
    add(cut_extrude11_tool1.solids().sort_by_distance((-21, 10, -27))[0], mode=Mode.SUBTRACT)
    add(cut_extrude11_tool2.solids().sort_by_distance((-21, 10, 27))[0], mode=Mode.SUBTRACT)


solid = part.part
